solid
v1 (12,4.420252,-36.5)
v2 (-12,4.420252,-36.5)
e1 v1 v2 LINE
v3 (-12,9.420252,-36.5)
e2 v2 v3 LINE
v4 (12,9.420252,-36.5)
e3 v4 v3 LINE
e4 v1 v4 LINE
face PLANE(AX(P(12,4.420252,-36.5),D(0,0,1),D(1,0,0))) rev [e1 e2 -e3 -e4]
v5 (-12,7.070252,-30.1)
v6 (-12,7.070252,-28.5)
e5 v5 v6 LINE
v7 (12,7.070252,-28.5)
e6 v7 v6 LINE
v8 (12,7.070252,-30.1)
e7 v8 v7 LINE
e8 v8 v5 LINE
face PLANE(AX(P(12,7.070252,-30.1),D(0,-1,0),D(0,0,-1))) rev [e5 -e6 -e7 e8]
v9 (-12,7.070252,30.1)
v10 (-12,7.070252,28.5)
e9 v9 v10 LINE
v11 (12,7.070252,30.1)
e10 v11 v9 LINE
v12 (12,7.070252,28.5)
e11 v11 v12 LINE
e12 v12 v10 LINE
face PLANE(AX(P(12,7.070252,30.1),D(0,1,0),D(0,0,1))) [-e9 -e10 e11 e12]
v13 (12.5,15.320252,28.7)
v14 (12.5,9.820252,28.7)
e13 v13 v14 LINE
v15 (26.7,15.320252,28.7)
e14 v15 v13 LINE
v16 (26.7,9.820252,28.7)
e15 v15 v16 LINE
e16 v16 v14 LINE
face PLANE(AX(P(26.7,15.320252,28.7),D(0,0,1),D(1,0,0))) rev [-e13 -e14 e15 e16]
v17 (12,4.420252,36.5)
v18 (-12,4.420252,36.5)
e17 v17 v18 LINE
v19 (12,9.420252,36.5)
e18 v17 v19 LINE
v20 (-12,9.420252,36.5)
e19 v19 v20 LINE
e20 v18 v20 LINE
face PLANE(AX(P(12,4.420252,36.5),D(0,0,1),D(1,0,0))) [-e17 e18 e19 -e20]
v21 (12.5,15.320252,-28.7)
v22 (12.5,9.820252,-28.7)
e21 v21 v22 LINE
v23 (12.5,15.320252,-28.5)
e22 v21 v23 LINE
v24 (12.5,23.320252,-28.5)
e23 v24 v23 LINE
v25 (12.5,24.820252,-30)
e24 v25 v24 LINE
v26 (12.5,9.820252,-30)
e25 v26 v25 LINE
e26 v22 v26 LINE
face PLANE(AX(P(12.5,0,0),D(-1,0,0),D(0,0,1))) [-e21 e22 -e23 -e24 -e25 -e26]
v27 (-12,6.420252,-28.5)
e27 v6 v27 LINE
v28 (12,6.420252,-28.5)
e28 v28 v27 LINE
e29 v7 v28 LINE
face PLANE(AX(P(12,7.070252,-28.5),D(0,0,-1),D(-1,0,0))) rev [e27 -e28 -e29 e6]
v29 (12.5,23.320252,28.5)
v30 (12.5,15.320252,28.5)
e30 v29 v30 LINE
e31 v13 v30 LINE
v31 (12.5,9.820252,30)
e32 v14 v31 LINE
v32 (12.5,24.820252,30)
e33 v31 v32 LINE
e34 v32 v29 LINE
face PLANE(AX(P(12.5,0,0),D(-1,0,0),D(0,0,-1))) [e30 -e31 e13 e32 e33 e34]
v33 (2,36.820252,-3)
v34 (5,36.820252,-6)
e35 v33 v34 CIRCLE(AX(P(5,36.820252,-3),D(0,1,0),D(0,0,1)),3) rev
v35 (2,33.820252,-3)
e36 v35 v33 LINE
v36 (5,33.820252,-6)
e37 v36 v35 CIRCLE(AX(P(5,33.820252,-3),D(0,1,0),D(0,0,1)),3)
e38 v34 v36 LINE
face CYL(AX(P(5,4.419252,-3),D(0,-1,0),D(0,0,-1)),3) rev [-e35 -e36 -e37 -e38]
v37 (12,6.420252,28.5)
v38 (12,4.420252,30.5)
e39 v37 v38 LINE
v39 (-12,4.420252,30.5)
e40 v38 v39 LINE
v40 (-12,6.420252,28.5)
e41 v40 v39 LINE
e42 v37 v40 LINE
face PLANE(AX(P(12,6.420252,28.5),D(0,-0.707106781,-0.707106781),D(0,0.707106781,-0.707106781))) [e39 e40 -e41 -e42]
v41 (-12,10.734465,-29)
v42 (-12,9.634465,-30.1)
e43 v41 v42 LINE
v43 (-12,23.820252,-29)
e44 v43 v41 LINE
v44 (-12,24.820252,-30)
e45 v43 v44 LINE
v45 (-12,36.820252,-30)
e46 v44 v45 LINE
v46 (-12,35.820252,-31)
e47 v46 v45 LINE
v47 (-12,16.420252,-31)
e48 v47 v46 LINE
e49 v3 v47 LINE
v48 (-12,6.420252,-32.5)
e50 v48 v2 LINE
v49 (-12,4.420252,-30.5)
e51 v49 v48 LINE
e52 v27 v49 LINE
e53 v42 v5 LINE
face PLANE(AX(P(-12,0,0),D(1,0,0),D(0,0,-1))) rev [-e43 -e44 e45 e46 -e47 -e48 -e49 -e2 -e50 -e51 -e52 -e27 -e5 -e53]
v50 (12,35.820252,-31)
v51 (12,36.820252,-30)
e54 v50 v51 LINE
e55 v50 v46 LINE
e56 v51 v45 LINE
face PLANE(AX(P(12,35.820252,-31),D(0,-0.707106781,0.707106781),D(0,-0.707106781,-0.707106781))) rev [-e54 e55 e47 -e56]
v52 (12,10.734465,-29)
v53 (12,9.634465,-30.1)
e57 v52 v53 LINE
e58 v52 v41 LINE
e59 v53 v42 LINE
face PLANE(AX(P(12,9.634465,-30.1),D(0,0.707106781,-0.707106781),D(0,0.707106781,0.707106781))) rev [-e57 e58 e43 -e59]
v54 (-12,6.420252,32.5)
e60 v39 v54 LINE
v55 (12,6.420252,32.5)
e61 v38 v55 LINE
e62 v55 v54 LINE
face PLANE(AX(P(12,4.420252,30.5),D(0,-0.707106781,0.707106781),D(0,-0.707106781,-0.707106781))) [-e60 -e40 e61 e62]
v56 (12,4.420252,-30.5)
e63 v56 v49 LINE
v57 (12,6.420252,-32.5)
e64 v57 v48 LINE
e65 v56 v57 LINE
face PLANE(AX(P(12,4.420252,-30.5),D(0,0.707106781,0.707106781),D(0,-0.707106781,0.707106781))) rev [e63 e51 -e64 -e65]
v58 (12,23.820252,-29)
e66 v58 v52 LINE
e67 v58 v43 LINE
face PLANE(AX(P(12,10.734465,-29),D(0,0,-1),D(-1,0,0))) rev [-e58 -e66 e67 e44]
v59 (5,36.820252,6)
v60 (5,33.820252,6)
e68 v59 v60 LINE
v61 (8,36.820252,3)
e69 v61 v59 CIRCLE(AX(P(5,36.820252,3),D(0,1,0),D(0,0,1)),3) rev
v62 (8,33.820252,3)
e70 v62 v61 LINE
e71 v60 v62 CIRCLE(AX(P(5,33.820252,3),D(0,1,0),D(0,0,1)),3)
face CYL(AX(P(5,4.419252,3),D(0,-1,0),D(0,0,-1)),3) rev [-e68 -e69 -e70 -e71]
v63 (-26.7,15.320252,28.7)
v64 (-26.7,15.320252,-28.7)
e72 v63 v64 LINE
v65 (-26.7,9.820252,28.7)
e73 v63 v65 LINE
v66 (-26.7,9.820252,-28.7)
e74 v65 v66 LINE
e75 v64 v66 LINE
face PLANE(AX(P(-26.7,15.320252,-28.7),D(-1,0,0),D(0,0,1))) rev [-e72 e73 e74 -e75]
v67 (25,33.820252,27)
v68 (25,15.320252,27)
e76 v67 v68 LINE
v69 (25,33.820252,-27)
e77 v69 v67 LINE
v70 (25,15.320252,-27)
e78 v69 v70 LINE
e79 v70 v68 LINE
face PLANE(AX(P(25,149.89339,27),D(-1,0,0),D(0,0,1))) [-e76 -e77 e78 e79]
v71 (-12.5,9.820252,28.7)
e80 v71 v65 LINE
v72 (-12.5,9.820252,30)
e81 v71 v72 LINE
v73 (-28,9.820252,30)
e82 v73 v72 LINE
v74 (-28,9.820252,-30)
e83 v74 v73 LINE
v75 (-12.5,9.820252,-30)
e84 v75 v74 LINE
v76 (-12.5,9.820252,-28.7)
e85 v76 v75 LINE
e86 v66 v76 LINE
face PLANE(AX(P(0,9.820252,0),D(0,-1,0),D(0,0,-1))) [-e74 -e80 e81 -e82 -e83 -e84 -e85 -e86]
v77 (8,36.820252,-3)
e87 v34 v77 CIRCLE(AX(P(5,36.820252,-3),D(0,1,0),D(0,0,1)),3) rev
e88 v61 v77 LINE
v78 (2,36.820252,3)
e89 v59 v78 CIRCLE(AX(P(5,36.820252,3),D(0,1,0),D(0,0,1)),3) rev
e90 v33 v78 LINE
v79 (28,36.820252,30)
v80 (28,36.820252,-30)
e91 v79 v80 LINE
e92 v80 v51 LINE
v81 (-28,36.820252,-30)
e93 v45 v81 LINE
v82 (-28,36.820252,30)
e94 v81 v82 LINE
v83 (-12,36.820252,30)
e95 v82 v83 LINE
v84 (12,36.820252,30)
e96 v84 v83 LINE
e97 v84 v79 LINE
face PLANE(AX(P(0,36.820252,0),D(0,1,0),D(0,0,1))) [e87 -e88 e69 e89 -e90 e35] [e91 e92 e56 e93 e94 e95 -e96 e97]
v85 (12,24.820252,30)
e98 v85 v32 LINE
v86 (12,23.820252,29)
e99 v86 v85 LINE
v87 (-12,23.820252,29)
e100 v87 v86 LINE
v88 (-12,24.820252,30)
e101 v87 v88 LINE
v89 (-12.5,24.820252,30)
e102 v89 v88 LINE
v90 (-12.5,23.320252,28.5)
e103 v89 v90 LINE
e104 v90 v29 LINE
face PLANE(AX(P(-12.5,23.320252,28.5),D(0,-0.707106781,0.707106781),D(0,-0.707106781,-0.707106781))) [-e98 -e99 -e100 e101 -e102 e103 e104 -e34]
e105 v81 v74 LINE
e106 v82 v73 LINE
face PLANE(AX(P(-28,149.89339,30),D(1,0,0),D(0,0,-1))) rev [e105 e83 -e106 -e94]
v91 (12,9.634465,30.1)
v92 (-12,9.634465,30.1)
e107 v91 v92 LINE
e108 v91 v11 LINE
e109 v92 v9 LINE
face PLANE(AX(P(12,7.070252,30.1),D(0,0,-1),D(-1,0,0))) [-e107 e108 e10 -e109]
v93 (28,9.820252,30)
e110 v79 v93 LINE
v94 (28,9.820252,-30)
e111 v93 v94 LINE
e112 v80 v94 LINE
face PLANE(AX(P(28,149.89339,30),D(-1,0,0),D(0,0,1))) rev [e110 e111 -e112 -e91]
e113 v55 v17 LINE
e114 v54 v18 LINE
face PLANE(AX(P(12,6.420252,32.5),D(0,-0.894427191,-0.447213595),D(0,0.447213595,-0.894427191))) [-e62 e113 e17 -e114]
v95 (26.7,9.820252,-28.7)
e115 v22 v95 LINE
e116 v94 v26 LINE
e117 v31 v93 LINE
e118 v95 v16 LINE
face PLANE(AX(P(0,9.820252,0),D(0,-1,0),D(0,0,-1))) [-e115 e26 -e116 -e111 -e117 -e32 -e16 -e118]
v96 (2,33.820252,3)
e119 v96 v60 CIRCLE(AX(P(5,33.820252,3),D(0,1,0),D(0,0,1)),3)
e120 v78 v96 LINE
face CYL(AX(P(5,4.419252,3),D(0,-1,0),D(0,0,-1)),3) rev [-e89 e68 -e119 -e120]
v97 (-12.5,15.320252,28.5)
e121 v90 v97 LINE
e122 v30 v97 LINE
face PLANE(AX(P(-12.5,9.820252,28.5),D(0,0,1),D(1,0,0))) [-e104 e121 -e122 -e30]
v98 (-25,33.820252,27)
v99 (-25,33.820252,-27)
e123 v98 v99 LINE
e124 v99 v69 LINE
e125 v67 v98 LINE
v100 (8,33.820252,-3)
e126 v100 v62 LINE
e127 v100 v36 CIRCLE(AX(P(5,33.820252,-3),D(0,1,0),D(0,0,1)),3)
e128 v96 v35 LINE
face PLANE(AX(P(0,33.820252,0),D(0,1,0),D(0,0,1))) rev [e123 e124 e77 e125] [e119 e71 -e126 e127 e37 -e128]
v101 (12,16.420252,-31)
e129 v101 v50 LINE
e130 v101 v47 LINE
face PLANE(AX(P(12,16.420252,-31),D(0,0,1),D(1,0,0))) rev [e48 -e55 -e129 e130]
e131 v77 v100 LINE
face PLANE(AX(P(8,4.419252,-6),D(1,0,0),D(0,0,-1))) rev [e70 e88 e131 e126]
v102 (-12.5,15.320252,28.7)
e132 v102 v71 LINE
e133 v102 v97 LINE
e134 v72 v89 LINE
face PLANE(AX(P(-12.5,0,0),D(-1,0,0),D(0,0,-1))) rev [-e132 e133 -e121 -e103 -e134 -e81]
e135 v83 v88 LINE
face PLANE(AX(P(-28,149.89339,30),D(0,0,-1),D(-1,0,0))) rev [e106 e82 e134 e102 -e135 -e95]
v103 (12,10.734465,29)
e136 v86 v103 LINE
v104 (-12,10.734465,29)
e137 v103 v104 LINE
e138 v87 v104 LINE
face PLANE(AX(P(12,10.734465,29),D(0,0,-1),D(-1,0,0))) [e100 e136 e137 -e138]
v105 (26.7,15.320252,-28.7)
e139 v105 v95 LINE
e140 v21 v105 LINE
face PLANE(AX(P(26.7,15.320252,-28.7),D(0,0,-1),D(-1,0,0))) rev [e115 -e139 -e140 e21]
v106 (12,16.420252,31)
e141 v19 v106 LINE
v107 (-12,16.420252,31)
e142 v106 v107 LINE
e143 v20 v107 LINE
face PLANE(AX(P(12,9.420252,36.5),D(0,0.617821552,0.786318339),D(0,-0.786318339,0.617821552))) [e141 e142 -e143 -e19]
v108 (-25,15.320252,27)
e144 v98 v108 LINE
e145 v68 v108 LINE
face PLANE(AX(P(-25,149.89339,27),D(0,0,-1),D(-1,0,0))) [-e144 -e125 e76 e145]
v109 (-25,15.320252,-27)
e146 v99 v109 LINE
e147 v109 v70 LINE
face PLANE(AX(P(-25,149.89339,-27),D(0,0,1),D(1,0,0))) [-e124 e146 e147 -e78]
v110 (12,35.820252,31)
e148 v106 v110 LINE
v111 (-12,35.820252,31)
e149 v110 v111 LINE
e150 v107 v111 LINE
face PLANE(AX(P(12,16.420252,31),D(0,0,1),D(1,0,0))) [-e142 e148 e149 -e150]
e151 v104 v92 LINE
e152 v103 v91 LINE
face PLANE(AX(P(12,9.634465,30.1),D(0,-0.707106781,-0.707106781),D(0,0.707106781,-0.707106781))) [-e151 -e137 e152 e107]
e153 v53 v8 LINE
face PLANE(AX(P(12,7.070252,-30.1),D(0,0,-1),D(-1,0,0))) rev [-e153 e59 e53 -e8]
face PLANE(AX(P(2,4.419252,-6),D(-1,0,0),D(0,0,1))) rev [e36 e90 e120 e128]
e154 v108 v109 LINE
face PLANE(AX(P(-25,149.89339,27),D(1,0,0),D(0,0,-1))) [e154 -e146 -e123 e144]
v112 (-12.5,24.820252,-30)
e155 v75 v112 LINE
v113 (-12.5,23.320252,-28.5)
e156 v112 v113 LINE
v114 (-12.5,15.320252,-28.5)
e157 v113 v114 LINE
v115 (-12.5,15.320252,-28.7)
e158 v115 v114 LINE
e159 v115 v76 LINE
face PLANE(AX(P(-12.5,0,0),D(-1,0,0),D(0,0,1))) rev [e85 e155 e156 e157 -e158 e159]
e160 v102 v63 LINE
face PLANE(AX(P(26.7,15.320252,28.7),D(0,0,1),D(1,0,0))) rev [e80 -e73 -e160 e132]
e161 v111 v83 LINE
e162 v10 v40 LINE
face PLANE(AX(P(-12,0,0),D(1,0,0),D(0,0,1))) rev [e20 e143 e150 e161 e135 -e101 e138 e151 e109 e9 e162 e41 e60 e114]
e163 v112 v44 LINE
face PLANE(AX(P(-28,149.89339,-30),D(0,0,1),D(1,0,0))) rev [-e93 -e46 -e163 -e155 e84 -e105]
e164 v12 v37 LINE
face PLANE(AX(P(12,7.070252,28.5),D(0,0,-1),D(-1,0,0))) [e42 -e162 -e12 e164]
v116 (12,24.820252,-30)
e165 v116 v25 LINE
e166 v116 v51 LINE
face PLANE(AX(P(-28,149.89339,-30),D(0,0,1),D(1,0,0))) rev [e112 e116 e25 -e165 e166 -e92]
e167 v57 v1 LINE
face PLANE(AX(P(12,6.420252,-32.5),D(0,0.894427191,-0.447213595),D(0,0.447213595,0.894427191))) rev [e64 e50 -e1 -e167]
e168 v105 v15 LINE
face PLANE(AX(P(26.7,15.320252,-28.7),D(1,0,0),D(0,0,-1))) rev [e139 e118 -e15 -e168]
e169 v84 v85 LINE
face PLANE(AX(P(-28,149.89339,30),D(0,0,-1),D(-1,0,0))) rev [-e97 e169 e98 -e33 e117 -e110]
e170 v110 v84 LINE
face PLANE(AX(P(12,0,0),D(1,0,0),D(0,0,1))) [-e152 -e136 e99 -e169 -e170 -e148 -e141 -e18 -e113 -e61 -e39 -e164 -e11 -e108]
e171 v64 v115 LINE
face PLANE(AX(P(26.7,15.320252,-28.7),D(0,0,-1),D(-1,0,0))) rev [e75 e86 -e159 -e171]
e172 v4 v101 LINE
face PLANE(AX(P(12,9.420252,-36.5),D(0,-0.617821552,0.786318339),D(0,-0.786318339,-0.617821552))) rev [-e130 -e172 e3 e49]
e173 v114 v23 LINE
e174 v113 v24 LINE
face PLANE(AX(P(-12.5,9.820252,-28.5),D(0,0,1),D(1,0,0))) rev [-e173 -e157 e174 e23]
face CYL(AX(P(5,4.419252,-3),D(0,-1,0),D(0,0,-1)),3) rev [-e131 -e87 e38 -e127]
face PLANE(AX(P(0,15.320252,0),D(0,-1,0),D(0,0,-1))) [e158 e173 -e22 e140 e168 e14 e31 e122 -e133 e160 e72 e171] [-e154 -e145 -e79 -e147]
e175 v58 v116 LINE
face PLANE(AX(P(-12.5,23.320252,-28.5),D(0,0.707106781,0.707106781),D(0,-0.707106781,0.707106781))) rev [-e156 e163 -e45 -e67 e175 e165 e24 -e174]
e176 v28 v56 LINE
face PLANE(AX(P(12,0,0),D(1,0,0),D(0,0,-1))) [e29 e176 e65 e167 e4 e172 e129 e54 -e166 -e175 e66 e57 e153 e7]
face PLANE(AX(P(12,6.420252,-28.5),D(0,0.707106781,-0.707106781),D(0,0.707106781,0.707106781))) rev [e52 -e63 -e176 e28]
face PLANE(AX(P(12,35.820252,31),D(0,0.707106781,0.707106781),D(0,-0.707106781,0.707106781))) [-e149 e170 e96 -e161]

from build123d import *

# Parameters (mm, degrees)
SKETCH1_W           = 56
SKETCH1_H           = 60
SKETCH1_W_2         = 50
SKETCH1_H_2         = 54
BOSS_EXTRUDE1_DEPTH = 24
SKETCH2_W           = 56
SKETCH2_H           = 60
BOSS_EXTRUDE2_DEPTH = 3
CUT_EXTRUDE1_DEPTH  = 12.5
BOSS_EXTRUDE3_DEPTH = 12
SKETCH5_W           = 53.4
SKETCH5_H           = 57.4
SKETCH5_W_2         = 50
SKETCH5_H_2         = 54
CUT_EXTRUDE2_DEPTH  = 5.5
CUT_EXTRUDE3_REACH  = 58.267
SKETCH6_W           = 6
SKETCH6_H           = 12
FILLET3_R           = 3


with BuildPart() as part:
    # Sketch1 → Boss-Extrude1 (new body)
    with BuildSketch(Plane(origin=(0, 9.820251789, 0), x_dir=(1, 0, 0), z_dir=(0, 1, 0))):
        Rectangle(SKETCH1_W, SKETCH1_H)
        Rectangle(SKETCH1_W_2, SKETCH1_H_2, mode=Mode.SUBTRACT)
    extrude(amount=BOSS_EXTRUDE1_DEPTH)

    # Sketch2 → Boss-Extrude2 (add)
    with BuildSketch(Plane(origin=(0, 33.820251789, 0), x_dir=(1, 0, 0), z_dir=(0, 1, 0))):
        Rectangle(SKETCH2_W, SKETCH2_H)
    extrude(amount=BOSS_EXTRUDE2_DEPTH)

    # Sketch3 → Cut-Extrude1 (cut, symmetric)
    with BuildSketch(Plane(origin=(0, 0, 0), x_dir=(0, 0, -1), z_dir=(1, 0, 0))):
        Polygon((28.5, 9.820251789), (28.5, 23.320251789), (30, 24.820251789), (30, 9.820251789), align=None)
    cut_extrude1 = extrude(amount=CUT_EXTRUDE1_DEPTH, both=True, mode=Mode.SUBTRACT)

    # Sketch4 → Boss-Extrude3 (add, symmetric)
    with BuildSketch(Plane(origin=(0, 0, 0), x_dir=(0, 0, -1), z_dir=(1, 0, 0))):
        Polygon((30.1, 7.070251789), (28.5, 7.070251789), (28.5, 6.420251789), (30.5, 4.420251789), (32.5, 6.420251789), (36.5, 4.420251789), (36.5, 9.420251789), (31, 16.420251789), (31, 35.820251789), (30, 36.820251789), (29, 36.820251789), (29, 10.734465351), (30.1, 9.634465351), align=None)
    boss_extrude3 = extrude(amount=BOSS_EXTRUDE3_DEPTH, both=True)

    # Sketch5 → Cut-Extrude2 (cut)
    with BuildSketch(Plane.XZ.offset(-9.820251789)):
        Rectangle(SKETCH5_W, SKETCH5_H)
        Rectangle(SKETCH5_W_2, SKETCH5_H_2, mode=Mode.SUBTRACT)
    extrude(amount=-CUT_EXTRUDE2_DEPTH, mode=Mode.SUBTRACT)

    # Mirror1: Cut-Extrude1, Boss-Extrude3 across plane
    add(cut_extrude1.mirror(Plane.XY), mode=Mode.SUBTRACT)
    add(boss_extrude3.mirror(Plane.XY))

    # Sketch6 → Cut-Extrude3 (cut, up to next)
    with BuildSketch(Plane(origin=(0, 36.820251789, 0), x_dir=(1, 0, 0), z_dir=(0, 1, 0)), mode=Mode.PRIVATE) as cut_extrude3_sk1:
        with Locations((5, 0)):
            Rectangle(SKETCH6_W, SKETCH6_H)
    cut_extrude3_tool1 = extrude(cut_extrude3_sk1.sketch, amount=-CUT_EXTRUDE3_REACH, mode=Mode.PRIVATE) & part.part
    add(cut_extrude3_tool1.solids().sort_by_distance((5, 36.820252, 0))[0], mode=Mode.SUBTRACT)

    # Fillet3
    fillet3_edges = [part.edges().sort_by_distance(p)[0] for p in [
        (2, 35.320251789, 6),
        (8, 35.320251789, 6),
        (8, 35.320251789, -6),
        (2, 35.320251789, -6),
    ]]
    fillet(fillet3_edges, radius=FILLET3_R - 0.0001)  # a hair under: the kernel refuses the full size


solid = part.part
